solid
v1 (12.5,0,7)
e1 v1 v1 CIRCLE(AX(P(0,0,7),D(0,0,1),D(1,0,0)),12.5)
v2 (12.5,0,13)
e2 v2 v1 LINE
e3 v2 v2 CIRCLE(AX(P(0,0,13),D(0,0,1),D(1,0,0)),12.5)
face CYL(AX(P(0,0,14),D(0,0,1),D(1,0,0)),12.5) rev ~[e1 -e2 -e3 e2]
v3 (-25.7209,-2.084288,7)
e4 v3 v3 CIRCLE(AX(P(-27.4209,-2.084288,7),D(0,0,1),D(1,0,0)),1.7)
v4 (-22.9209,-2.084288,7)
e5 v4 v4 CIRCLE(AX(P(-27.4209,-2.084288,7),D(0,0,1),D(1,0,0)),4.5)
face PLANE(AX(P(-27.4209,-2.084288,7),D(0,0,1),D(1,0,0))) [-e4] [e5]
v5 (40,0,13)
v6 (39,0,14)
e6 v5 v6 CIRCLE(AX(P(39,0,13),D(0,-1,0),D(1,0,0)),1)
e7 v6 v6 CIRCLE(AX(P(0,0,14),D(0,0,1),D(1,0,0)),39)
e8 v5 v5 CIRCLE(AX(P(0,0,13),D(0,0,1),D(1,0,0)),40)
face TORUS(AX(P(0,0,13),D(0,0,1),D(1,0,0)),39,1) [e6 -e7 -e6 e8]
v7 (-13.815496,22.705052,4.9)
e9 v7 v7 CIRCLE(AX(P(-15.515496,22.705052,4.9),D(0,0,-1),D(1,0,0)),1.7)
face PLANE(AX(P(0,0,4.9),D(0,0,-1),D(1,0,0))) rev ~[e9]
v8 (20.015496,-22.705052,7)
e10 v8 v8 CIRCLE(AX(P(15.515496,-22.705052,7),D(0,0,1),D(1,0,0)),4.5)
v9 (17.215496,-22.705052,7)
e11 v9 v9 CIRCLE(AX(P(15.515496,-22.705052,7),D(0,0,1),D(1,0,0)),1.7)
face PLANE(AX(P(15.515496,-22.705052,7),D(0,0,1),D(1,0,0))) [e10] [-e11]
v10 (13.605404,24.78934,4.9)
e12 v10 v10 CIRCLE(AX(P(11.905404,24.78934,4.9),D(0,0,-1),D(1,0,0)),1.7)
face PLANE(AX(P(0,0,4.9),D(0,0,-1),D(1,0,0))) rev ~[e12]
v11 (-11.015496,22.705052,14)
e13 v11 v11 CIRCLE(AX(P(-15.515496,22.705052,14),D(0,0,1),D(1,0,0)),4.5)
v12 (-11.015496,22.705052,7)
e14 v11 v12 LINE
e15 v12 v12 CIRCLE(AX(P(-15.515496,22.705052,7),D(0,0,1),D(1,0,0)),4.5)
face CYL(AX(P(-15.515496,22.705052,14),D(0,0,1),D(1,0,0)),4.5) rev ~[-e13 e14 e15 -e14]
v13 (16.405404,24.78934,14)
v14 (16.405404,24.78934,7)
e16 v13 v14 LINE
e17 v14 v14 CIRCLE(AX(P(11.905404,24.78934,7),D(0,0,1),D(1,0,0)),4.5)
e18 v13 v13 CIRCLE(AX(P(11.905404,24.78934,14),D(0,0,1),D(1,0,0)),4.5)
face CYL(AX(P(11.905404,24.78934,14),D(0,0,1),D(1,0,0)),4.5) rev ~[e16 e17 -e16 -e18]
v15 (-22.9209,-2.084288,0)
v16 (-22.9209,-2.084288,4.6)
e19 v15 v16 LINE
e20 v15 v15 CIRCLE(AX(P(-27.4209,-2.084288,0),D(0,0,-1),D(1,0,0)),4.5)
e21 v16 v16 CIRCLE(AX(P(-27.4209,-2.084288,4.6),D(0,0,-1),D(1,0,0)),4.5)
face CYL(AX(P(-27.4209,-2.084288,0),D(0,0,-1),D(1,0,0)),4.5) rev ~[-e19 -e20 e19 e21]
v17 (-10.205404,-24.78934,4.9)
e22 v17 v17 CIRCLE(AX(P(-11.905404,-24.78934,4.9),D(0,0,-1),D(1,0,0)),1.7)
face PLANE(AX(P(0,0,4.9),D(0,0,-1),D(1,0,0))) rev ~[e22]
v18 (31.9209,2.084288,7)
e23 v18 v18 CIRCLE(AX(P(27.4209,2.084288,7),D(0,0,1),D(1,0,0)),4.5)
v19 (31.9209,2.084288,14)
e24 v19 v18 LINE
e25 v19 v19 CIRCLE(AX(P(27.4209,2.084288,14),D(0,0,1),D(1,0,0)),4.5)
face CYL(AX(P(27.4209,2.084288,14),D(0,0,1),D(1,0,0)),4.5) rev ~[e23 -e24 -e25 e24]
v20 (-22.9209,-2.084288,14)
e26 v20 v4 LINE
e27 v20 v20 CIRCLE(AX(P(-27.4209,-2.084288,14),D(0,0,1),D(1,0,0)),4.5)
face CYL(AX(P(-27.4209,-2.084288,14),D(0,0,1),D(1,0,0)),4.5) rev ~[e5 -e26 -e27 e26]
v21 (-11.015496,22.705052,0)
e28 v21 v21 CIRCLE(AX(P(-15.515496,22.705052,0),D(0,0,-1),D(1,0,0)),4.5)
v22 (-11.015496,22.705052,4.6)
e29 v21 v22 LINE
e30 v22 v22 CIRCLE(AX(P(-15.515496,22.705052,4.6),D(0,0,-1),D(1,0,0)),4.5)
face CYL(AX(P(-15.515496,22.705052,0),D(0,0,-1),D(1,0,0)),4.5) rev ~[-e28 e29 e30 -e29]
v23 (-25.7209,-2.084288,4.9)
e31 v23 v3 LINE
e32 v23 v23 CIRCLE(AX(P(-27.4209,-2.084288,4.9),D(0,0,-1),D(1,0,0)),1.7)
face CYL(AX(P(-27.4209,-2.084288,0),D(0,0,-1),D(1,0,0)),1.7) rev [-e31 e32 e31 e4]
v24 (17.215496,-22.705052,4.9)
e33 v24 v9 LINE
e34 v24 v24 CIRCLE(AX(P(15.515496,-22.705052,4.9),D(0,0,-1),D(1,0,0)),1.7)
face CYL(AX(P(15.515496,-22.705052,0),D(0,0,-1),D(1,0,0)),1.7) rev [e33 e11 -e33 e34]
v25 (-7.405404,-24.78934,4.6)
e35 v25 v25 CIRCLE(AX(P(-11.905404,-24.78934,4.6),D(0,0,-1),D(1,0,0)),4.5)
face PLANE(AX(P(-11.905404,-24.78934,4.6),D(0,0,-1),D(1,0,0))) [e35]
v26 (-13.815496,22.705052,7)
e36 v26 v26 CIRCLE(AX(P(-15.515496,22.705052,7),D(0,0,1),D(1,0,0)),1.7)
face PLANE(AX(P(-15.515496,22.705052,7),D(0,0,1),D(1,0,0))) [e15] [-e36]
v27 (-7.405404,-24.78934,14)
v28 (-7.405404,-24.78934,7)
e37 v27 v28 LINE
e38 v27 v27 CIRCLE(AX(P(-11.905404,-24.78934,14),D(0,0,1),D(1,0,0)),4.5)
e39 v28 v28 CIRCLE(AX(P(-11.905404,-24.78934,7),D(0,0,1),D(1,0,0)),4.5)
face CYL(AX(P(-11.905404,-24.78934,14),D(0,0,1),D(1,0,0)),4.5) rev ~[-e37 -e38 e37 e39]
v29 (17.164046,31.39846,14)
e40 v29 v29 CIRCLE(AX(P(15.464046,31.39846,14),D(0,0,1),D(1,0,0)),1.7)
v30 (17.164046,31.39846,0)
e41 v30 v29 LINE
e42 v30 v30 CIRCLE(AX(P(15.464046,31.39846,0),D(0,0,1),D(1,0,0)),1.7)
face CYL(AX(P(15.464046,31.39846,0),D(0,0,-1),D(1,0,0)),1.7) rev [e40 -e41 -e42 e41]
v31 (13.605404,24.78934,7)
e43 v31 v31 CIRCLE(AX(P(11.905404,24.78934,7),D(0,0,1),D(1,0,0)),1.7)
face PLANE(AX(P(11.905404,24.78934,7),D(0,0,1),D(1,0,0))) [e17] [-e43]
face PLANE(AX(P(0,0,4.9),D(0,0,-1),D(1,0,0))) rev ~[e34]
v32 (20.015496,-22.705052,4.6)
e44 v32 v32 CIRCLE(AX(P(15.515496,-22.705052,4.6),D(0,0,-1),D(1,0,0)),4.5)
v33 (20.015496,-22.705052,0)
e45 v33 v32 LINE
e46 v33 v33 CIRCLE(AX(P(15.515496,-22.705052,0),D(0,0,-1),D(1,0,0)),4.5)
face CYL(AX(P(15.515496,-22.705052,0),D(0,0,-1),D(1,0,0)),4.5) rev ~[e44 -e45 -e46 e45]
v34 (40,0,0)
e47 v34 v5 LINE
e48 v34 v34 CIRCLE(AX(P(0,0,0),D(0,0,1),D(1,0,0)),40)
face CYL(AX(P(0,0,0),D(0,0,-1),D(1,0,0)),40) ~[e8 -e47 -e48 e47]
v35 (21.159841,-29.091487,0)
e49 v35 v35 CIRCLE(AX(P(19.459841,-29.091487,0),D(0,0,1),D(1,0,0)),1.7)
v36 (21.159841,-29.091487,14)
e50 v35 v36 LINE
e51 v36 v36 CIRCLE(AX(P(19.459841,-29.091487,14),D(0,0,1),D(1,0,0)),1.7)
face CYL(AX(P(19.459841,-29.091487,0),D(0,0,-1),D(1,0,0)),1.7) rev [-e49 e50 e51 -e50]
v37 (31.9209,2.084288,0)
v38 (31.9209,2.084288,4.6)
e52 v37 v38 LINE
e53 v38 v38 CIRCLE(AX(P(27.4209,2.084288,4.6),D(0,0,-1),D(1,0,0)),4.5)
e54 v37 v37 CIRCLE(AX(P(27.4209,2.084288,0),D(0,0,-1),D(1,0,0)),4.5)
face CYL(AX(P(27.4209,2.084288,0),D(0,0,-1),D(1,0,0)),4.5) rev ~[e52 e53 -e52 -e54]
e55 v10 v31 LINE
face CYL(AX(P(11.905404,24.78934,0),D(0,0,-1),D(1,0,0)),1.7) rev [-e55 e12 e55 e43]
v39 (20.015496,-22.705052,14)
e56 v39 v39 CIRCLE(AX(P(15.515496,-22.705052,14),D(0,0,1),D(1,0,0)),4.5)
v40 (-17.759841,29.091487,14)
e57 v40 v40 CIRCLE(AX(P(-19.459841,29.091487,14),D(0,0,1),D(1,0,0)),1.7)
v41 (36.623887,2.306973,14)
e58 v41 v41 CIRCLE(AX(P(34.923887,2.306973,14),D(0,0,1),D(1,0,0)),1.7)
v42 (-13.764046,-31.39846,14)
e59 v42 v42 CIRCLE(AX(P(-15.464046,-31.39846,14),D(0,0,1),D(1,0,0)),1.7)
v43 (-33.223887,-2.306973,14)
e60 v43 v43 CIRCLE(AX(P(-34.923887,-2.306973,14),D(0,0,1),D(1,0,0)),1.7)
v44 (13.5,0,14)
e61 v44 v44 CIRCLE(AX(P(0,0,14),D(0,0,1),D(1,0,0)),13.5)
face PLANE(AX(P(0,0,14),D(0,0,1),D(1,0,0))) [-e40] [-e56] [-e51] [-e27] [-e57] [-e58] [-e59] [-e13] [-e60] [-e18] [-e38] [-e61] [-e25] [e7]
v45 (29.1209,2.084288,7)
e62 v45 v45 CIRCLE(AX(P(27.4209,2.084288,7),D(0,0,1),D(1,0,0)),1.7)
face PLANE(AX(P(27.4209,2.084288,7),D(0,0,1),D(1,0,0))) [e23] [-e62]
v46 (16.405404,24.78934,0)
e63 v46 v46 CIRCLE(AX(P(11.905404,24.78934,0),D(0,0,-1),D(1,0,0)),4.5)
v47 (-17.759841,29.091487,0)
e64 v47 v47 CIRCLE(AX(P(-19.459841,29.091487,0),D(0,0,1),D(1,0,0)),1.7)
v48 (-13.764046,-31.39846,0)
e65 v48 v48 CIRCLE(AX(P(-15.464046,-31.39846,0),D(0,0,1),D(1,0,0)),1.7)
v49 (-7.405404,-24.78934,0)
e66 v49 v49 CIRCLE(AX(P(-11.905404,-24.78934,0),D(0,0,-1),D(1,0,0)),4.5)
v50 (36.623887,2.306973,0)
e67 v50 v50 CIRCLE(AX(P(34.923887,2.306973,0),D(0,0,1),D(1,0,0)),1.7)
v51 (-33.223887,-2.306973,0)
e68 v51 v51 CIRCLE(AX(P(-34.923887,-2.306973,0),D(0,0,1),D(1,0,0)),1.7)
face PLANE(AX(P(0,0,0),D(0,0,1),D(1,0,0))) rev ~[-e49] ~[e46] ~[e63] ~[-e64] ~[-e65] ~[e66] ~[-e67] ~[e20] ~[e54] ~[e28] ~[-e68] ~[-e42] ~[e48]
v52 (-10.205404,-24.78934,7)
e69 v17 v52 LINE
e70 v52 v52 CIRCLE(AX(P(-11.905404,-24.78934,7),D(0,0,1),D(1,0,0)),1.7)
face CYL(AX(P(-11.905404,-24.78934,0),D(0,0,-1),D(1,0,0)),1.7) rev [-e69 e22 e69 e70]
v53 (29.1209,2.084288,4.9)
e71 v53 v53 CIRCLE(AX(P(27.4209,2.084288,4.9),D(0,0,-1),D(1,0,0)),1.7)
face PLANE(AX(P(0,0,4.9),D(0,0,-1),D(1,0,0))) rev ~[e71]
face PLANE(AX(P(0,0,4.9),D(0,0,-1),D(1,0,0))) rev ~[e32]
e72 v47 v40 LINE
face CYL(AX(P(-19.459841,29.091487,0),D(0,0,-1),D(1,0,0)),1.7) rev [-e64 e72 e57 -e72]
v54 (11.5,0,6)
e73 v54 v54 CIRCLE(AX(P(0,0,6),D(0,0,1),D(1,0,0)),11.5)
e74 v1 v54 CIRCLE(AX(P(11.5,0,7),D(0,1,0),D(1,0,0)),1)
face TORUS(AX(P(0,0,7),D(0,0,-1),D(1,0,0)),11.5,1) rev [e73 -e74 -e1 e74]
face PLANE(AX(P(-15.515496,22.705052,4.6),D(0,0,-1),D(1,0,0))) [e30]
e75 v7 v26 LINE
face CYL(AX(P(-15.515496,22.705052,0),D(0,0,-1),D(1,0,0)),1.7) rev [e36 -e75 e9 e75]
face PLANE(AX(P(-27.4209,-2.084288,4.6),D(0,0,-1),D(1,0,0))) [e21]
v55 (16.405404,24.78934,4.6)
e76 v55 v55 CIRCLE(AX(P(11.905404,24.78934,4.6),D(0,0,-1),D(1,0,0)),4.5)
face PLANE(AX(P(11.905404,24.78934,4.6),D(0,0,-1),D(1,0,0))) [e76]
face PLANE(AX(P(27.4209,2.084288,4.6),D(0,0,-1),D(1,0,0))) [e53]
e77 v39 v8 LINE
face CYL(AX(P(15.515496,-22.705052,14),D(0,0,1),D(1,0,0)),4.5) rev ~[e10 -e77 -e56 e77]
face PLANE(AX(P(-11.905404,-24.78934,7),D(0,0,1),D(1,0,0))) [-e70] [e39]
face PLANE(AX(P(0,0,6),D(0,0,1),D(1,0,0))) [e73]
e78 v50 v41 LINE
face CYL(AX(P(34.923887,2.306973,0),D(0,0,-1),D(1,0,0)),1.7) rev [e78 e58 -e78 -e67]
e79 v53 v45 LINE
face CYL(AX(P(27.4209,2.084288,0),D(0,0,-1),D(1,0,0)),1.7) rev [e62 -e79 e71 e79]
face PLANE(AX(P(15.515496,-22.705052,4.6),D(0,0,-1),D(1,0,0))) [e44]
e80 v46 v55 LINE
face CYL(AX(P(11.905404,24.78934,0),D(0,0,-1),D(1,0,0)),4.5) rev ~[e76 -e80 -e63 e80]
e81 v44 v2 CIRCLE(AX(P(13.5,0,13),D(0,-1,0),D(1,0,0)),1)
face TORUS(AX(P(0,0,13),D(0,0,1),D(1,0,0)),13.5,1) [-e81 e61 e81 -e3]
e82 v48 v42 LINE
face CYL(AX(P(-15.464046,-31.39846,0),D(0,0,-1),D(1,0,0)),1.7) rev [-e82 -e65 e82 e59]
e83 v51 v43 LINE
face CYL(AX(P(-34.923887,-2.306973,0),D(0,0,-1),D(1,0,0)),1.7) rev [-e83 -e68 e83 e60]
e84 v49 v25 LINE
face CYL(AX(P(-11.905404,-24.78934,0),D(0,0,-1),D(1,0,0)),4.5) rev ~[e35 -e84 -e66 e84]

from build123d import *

# Parameters (mm, degrees)
F0_R      = 40
F0_R_2    = 1.7
F1_DEPTH  = 14
F2_R      = 4.5
F2_R_2    = 1.7
F3_DEPTH  = 7
F4_R      = 4.5
F4_R_2    = 1.7
F5_DEPTH  = 4.6
F6_R      = 12.5
F7_DEPTH  = 8
F8_R      = 1
F10_R     = 32.1563127089
F11_DEPTH = 0.3


with BuildPart() as f1:
    # F0 (on Top) → F1 (new body)
    with BuildSketch(Plane.XY):
        Circle(F0_R)
        with Locations((-15.4640459878, -31.3984598617)):
            Circle(F0_R_2, mode=Mode.SUBTRACT)
        with Locations((-11.9054035877, -24.7893397535)):
            Circle(F0_R_2, mode=Mode.SUBTRACT)
        with Locations((-34.9238868738, -2.3069732602)):
            Circle(F0_R_2, mode=Mode.SUBTRACT)
        with Locations((-27.4208997634, -2.0842879275)):
            Circle(F0_R_2, mode=Mode.SUBTRACT)
        with Locations((19.4598408861, -29.0914866016)):
            Circle(F0_R_2, mode=Mode.SUBTRACT)
        with Locations((15.5154961757, -22.705051826)):
            Circle(F0_R_2, mode=Mode.SUBTRACT)
        with Locations((-15.5154961757, 22.705051826)):
            Circle(F0_R_2, mode=Mode.SUBTRACT)
        with Locations((-19.4598408861, 29.0914866016)):
            Circle(F0_R_2, mode=Mode.SUBTRACT)
        with Locations((27.4208997634, 2.0842879275)):
            Circle(F0_R_2, mode=Mode.SUBTRACT)
        with Locations((34.9238868738, 2.3069732602)):
            Circle(F0_R_2, mode=Mode.SUBTRACT)
        with Locations((11.9054035877, 24.7893397535)):
            Circle(F0_R_2, mode=Mode.SUBTRACT)
        with Locations((15.4640459878, 31.3984598617)):
            Circle(F0_R_2, mode=Mode.SUBTRACT)
    extrude(amount=F1_DEPTH)

    # F2 (on face) → F3 (cut)
    with BuildSketch(Plane.XY.offset(14)):
        with Locations((-15.5154961757, 22.705051826)):
            Circle(F2_R)
        with Locations((-15.5154961757, 22.705051826)):
            Circle(F2_R_2, mode=Mode.SUBTRACT)
        with Locations((-27.4208997634, -2.0842879275)):
            Circle(F2_R)
        with Locations((-27.4208997634, -2.0842879275)):
            Circle(F2_R_2, mode=Mode.SUBTRACT)
        with Locations((-11.9054035877, -24.7893397535)):
            Circle(F2_R)
        with Locations((-11.9054035877, -24.7893397535)):
            Circle(F2_R_2, mode=Mode.SUBTRACT)
        with Locations((15.5154961757, -22.705051826)):
            Circle(F2_R)
        with Locations((15.5154961757, -22.705051826)):
            Circle(F2_R_2, mode=Mode.SUBTRACT)
        with Locations((27.4208997634, 2.0842879275)):
            Circle(F2_R)
        with Locations((27.4208997634, 2.0842879275)):
            Circle(F2_R_2, mode=Mode.SUBTRACT)
        with Locations((11.9054035877, 24.7893397535)):
            Circle(F2_R)
        with Locations((11.9054035877, 24.7893397535)):
            Circle(F2_R_2, mode=Mode.SUBTRACT)
    extrude(amount=-F3_DEPTH, mode=Mode.SUBTRACT)

    # F4 (on face) → F5 (cut)
    with BuildSketch(Plane(origin=(0, 0, 0), x_dir=(1, 0, 0), z_dir=(0, 0, -1))):
        with Locations((27.4208997634, -2.0842879275)):
            Circle(F4_R)
        with Locations((27.4208997634, -2.0842879275)):
            Circle(F4_R_2, mode=Mode.SUBTRACT)
        with Locations((15.5154961757, 22.705051826)):
            Circle(F4_R)
        with Locations((15.5154961757, 22.705051826)):
            Circle(F4_R_2, mode=Mode.SUBTRACT)
        with Locations((-11.9054035877, 24.7893397535)):
            Circle(F4_R)
        with Locations((-11.9054035877, 24.7893397535)):
            Circle(F4_R_2, mode=Mode.SUBTRACT)
        with Locations((-27.4208997634, 2.0842879275)):
            Circle(F4_R)
        with Locations((-27.4208997634, 2.0842879275)):
            Circle(F4_R_2, mode=Mode.SUBTRACT)
        with Locations((-15.5154961757, -22.705051826)):
            Circle(F4_R)
        with Locations((-15.5154961757, -22.705051826)):
            Circle(F4_R_2, mode=Mode.SUBTRACT)
        with Locations((11.9054035877, -24.7893397535)):
            Circle(F4_R)
        with Locations((11.9054035877, -24.7893397535)):
            Circle(F4_R_2, mode=Mode.SUBTRACT)
        with Locations((27.4208997634, -2.0842879275)):
            Circle(F4_R_2)
    extrude(amount=-F5_DEPTH, mode=Mode.SUBTRACT)

    # F6 (on face) → F7 (cut)
    with BuildSketch(Plane.XY.offset(14)):
        Circle(F6_R)
    extrude(amount=-F7_DEPTH, mode=Mode.SUBTRACT)

    # F8
    f8_edges = [f1.edges().sort_by_distance(p)[0] for p in [
        (-12.5, 0, 6),
        (-12.5, 0, 14),
        (-40, 0, 14),
    ]]
    fillet(f8_edges, radius=F8_R)

    # F10 (on offset) → F11 (join)
    with BuildSketch(Plane(origin=(0, 0, 4.6), x_dir=(1, 0, 0), z_dir=(0, 0, -1))):
        Circle(F10_R)
    extrude(amount=-F11_DEPTH)


solid = f1.part
